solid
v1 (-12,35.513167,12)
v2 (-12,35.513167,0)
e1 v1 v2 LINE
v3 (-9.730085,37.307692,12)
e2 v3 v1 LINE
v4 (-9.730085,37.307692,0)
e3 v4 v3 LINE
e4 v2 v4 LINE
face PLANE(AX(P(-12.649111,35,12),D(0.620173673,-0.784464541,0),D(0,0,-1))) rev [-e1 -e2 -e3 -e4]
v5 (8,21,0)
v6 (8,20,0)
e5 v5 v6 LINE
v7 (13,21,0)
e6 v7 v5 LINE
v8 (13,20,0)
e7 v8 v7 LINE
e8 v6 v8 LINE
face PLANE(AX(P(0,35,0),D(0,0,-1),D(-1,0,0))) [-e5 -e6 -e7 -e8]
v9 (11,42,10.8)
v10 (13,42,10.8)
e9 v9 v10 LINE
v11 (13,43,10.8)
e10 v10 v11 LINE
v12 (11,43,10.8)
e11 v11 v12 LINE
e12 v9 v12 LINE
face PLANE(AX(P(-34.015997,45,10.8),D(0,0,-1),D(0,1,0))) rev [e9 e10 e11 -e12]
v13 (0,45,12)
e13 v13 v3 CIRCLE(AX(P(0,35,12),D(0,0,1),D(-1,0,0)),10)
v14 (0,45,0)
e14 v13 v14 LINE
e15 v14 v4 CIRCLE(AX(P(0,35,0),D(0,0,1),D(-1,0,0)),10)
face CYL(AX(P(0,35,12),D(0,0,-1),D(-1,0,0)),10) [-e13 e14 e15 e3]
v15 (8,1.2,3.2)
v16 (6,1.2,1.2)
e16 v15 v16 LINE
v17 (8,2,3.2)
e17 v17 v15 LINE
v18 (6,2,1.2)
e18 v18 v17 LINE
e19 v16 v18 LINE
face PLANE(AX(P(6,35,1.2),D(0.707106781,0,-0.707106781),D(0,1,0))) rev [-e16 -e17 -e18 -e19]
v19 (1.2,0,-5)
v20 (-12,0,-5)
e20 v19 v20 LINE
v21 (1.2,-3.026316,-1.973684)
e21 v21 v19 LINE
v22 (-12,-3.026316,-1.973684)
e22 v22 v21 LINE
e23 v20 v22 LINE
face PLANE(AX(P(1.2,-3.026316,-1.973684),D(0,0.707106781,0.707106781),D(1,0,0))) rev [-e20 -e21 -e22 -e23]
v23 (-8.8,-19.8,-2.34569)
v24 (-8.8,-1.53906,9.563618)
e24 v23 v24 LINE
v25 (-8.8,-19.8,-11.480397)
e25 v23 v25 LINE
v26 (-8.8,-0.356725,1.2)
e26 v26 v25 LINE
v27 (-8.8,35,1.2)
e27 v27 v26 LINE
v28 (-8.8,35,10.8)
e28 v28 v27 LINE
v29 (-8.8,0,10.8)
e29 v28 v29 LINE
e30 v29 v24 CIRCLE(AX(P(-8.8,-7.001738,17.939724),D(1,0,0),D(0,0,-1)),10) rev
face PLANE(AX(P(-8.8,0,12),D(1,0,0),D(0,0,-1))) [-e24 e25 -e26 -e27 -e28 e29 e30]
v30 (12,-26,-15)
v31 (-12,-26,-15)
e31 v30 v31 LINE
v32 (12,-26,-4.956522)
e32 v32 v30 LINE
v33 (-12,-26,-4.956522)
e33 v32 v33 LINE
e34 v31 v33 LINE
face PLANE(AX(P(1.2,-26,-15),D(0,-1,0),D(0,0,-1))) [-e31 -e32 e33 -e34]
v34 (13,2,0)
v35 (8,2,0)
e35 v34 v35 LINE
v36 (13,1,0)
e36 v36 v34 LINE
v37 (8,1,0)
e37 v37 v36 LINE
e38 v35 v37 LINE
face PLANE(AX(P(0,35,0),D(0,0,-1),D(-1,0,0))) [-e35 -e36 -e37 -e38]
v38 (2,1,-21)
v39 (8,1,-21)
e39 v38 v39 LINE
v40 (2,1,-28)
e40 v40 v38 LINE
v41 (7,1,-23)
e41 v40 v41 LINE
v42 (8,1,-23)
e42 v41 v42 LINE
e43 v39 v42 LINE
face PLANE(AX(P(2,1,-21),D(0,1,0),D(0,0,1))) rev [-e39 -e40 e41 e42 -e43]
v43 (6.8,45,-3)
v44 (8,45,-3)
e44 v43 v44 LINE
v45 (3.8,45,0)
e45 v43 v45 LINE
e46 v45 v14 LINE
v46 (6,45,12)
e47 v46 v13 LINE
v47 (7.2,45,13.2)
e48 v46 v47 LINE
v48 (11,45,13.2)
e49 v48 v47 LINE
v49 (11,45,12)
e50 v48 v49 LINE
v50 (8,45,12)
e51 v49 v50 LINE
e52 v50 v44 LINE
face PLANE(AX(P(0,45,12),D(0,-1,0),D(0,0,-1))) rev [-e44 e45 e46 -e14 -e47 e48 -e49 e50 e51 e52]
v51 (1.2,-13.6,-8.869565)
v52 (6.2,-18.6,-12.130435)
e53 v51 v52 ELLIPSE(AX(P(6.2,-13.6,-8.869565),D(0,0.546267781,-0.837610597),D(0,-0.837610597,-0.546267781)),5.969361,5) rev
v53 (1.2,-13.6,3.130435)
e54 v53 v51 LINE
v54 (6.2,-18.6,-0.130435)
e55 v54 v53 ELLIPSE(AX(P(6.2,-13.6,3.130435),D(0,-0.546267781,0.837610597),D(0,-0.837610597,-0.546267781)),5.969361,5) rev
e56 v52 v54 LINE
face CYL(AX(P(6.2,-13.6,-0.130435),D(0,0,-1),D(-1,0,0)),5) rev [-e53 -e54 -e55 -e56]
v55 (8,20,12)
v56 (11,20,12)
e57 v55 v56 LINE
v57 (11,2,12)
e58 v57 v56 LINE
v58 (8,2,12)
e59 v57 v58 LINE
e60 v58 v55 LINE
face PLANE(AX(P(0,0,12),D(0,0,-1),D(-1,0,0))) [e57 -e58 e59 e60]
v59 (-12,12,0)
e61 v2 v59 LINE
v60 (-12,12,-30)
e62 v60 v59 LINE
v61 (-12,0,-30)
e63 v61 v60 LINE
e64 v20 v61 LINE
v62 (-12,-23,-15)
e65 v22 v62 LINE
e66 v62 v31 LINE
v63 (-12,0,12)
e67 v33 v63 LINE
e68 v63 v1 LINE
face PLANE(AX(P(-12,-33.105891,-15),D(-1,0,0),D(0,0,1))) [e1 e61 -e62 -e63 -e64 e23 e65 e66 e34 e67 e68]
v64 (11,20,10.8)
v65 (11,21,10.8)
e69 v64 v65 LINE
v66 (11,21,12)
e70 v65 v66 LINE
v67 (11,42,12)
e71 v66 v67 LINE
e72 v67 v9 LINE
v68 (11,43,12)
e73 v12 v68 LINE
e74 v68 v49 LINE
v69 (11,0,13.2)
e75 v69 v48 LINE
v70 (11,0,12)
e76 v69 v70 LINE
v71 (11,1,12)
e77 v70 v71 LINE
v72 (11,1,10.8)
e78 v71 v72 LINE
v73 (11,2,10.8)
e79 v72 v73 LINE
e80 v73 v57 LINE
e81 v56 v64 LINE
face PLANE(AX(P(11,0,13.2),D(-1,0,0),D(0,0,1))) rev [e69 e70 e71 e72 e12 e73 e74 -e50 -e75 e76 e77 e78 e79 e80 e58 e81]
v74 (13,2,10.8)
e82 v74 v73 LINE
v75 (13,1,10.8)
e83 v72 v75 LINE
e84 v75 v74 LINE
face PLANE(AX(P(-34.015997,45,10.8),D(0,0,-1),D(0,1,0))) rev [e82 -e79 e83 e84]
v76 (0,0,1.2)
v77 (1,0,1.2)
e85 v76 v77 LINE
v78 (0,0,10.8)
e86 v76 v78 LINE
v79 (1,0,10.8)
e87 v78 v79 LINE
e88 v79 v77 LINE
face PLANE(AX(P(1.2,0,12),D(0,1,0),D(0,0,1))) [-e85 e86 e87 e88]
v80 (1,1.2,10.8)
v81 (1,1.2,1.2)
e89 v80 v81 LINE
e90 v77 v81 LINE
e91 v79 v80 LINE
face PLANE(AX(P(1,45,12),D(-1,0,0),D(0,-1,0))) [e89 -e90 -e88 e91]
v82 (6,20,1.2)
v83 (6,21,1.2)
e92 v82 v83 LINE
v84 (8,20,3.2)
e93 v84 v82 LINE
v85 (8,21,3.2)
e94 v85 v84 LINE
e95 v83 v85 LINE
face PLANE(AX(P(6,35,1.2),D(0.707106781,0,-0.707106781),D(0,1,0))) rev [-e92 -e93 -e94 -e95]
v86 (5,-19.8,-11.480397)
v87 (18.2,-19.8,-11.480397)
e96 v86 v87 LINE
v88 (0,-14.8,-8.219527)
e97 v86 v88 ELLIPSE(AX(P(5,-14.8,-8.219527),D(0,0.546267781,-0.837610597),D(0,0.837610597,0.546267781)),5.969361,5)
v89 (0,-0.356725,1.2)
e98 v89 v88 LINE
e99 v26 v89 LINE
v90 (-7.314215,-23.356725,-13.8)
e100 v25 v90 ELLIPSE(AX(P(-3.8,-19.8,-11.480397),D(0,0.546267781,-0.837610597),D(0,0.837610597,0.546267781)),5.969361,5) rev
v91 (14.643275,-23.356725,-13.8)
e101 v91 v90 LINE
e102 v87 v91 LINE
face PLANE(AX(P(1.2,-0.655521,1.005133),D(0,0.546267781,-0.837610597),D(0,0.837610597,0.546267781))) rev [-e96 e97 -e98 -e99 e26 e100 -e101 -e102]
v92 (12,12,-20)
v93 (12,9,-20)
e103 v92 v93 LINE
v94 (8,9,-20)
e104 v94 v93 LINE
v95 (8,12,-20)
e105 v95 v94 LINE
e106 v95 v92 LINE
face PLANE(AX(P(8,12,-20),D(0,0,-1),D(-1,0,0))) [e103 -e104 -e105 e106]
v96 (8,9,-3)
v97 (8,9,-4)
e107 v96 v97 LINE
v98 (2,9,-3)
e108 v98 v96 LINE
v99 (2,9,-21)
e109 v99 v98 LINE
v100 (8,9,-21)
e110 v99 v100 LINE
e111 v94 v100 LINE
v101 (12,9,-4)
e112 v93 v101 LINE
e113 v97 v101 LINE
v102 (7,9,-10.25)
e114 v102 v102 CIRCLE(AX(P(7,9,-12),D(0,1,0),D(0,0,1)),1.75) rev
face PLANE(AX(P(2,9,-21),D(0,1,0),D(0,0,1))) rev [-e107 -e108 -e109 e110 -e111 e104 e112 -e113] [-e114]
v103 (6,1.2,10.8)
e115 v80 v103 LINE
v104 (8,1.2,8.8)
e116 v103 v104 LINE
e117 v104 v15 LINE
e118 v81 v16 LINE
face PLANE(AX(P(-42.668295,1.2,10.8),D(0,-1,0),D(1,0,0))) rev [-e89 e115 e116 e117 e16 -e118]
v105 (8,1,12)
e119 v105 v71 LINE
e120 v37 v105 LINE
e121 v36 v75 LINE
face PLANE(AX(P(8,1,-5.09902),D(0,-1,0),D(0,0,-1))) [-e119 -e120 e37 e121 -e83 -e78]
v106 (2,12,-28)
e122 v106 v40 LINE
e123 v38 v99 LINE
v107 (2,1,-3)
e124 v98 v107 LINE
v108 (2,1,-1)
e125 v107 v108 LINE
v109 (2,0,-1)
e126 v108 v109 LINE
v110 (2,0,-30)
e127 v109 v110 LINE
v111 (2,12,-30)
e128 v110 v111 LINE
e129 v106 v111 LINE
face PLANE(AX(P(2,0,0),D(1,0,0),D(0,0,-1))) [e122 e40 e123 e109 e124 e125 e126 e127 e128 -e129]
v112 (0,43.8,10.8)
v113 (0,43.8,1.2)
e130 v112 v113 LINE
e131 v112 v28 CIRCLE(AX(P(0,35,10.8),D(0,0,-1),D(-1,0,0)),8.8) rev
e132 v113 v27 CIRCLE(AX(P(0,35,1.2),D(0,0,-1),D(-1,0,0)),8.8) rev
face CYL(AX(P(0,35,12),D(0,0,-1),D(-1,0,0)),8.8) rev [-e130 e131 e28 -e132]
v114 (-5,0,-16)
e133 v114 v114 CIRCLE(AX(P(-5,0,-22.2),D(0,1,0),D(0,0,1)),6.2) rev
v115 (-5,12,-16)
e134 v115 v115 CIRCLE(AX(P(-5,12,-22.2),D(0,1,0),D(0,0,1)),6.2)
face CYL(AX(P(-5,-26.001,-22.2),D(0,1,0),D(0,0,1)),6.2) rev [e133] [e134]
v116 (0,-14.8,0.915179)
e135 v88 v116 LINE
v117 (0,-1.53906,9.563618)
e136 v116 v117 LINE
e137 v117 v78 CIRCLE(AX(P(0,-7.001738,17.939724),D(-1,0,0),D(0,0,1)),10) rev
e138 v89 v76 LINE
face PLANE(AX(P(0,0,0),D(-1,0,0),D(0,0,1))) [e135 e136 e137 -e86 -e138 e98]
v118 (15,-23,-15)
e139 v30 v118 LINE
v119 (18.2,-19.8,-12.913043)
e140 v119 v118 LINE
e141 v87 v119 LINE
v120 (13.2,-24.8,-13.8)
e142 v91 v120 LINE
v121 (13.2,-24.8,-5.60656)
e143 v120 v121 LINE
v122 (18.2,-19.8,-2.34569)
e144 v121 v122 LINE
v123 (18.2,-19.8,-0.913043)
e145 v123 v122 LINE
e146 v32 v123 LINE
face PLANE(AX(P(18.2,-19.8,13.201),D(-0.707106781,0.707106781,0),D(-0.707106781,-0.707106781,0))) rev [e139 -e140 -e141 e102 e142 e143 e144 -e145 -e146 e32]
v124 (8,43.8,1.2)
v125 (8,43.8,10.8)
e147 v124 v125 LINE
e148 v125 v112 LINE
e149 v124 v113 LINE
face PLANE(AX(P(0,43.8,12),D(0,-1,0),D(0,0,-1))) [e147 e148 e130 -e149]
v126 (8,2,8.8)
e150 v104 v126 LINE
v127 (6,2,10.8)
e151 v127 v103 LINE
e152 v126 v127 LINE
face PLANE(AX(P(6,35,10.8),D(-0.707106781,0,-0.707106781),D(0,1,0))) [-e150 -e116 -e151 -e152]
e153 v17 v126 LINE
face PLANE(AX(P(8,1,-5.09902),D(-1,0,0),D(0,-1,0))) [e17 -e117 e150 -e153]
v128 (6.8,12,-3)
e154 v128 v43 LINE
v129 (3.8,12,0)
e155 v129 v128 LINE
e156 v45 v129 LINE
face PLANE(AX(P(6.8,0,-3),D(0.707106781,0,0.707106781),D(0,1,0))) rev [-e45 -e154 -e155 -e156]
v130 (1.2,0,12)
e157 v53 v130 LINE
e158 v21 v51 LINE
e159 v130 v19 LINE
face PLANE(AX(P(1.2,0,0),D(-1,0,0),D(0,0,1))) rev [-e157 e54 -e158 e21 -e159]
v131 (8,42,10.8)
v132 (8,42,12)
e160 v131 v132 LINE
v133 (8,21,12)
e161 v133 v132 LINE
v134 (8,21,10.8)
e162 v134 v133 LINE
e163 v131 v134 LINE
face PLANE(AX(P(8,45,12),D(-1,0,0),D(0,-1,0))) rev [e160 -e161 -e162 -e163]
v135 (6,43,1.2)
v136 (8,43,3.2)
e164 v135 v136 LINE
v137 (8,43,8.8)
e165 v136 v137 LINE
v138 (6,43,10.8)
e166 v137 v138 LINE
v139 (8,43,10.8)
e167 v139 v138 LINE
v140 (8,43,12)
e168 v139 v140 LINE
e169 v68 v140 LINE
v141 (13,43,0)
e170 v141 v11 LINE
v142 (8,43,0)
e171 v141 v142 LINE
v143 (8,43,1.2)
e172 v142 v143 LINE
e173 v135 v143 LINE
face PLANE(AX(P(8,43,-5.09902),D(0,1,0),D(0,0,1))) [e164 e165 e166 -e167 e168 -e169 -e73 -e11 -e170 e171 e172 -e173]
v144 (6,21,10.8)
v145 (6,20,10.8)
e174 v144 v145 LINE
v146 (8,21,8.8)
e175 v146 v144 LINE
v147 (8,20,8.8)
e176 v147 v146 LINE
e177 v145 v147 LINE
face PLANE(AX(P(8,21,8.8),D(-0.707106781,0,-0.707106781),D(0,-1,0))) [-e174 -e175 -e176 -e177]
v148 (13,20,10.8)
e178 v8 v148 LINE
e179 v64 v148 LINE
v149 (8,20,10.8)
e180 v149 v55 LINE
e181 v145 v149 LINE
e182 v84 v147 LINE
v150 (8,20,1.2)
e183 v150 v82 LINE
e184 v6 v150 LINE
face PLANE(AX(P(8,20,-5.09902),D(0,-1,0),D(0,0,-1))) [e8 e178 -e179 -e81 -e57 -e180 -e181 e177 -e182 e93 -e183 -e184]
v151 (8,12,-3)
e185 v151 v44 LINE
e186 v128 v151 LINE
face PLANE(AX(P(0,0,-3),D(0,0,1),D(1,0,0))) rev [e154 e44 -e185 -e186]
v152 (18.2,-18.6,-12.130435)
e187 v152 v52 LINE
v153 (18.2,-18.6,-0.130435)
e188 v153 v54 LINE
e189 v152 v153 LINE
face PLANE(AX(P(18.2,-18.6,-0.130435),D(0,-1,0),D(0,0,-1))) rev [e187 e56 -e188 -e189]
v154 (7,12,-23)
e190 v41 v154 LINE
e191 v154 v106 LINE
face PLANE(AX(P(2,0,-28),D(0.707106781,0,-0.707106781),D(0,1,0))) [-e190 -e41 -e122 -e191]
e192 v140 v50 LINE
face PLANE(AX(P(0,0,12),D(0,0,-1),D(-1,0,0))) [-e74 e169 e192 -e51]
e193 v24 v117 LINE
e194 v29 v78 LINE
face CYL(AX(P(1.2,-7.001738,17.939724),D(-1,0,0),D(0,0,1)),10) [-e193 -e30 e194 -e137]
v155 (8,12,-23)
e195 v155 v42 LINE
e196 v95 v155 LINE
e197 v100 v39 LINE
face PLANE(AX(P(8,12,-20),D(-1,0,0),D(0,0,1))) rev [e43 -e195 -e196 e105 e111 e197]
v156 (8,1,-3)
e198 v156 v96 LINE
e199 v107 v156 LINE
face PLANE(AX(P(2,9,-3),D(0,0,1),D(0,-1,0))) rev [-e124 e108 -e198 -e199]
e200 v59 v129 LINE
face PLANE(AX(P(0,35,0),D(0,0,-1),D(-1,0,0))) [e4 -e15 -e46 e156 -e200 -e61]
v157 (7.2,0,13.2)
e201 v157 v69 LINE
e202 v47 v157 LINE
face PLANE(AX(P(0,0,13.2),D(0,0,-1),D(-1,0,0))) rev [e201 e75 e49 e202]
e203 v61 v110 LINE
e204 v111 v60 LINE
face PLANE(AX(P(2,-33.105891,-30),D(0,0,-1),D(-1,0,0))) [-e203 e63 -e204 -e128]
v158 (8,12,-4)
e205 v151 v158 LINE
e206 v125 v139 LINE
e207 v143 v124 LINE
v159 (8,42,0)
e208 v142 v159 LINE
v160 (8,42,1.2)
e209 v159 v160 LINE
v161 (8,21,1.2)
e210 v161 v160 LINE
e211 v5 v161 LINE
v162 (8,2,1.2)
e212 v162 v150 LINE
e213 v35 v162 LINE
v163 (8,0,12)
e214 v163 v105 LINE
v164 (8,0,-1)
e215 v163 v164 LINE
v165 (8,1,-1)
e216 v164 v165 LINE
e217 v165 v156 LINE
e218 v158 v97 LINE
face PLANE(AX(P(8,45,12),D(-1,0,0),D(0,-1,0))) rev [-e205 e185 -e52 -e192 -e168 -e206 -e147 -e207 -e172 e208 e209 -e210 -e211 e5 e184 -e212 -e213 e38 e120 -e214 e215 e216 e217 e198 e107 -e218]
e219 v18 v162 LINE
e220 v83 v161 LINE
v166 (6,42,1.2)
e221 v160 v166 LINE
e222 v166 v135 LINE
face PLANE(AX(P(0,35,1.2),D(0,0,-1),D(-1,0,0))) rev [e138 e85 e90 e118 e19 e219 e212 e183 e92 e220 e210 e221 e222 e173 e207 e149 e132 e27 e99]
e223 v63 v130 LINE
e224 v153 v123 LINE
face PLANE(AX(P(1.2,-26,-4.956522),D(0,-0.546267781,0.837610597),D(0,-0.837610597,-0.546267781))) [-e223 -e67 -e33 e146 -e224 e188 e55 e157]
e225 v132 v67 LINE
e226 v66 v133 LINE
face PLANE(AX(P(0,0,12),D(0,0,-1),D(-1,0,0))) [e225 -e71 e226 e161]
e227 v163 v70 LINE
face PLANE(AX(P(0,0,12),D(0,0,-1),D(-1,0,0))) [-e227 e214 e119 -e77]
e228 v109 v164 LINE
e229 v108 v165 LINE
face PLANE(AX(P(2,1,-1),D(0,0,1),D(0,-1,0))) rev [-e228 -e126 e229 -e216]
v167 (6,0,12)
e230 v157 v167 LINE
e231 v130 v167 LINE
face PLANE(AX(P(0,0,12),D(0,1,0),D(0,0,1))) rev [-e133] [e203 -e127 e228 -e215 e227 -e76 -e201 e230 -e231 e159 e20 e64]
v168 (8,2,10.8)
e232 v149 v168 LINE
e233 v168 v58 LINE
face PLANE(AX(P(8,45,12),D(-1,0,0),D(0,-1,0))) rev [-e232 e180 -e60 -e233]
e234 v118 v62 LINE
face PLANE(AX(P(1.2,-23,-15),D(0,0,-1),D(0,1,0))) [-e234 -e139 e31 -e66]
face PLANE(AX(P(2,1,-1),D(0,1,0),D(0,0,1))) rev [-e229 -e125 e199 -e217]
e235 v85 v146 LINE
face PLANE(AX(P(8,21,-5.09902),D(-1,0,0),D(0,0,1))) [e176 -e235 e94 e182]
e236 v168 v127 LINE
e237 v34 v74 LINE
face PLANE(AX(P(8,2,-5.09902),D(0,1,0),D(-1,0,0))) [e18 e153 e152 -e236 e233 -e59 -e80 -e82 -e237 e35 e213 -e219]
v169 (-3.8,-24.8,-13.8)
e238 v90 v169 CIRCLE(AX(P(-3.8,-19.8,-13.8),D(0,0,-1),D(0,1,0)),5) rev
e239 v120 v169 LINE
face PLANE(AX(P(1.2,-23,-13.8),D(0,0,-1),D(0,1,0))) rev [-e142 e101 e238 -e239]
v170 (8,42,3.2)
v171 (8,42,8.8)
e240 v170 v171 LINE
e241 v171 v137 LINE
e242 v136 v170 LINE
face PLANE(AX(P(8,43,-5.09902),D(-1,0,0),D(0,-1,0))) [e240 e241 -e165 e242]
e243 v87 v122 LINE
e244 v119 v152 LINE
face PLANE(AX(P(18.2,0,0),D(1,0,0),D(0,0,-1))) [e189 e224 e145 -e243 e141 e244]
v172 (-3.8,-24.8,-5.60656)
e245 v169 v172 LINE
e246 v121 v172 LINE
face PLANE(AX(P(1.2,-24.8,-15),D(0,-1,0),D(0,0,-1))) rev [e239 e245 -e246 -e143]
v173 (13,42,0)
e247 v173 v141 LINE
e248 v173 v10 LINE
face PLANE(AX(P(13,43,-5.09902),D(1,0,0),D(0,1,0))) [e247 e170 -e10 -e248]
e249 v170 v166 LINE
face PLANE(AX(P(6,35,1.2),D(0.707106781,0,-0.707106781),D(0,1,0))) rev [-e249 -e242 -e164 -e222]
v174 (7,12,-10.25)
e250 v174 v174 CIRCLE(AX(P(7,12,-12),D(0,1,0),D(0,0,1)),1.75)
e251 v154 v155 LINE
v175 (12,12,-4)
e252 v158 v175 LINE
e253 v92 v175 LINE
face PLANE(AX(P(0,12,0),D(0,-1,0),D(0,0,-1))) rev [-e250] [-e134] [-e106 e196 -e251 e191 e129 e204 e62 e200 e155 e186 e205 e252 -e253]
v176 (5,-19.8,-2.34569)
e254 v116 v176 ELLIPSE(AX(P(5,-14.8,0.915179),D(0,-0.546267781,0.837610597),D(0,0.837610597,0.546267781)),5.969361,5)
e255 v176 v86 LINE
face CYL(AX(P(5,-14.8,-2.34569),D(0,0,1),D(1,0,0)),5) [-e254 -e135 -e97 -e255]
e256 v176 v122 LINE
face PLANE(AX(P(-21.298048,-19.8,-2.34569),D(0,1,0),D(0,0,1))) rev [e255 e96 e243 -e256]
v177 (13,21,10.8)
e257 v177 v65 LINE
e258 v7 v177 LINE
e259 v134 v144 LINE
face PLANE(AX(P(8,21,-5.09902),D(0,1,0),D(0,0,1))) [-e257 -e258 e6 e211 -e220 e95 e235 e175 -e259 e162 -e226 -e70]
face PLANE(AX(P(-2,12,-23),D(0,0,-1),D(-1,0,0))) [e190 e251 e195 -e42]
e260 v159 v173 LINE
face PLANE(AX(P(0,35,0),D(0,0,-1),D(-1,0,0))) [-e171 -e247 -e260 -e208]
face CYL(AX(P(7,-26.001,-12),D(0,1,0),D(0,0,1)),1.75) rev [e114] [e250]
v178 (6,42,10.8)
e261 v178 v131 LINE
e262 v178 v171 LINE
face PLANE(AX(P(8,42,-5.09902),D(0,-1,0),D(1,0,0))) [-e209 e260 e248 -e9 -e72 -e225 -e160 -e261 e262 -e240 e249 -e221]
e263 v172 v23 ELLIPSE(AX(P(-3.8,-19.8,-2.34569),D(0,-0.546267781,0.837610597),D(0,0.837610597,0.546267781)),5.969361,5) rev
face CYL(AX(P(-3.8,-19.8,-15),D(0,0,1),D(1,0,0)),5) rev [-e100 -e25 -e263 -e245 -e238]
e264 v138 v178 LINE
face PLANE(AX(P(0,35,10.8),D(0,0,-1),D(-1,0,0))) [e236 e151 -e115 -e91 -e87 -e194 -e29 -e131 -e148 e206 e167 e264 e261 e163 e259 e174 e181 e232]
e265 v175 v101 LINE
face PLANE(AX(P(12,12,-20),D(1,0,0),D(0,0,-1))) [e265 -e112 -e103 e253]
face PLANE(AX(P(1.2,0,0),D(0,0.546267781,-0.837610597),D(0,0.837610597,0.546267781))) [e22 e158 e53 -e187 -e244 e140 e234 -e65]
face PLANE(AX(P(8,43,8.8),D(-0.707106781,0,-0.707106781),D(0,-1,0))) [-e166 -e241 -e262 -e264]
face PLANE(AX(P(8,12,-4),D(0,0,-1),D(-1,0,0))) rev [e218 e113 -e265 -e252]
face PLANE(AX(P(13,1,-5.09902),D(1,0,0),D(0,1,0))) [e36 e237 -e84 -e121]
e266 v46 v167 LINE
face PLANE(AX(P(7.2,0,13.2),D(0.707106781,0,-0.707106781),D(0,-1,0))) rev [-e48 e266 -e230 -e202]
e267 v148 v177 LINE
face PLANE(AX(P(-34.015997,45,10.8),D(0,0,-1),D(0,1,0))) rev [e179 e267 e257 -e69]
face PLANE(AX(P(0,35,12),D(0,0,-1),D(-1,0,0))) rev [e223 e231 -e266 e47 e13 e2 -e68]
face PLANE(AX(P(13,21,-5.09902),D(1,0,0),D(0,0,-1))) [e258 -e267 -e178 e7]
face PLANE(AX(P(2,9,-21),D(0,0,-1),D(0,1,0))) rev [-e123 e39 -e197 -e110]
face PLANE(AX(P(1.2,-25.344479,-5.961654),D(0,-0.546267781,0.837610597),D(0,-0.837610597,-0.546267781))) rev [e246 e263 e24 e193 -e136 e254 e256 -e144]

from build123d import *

# Parameters (mm, degrees)
BOSS_EXTRUDE1_DEPTH       = 12
SHELL1_T                  = -1.2
SHELL1_THICKNESS_2_FACE_W = 43.8
SHELL1_THICKNESS_2_FACE_H = 9.6
SHELL1_THICKNESS_2_DEPTH  = 5.8
SKETCH2_W                 = 9.6
SKETCH2_H                 = 42.6
CUT_EXTRUDE2_DEPTH        = 7
BOSS_EXTRUDE3_REACH       = 49.634
SKETCH3_W                 = 5
SKETCH3_H                 = 1
BOSS_EXTRUDE4_DEPTH       = 11.2
SHELL2_START              = -8.8
SHELL2_DEPTH              = 8.8
CUT_EXTRUDE3_REACH        = 50.88
FILLET1_R                 = 10
BOSS_EXTRUDE5_DEPTH       = 17
SKETCH7_W                 = 5
SKETCH7_H                 = 45
BOSS_EXTRUDE6_DEPTH       = 1.2
SKETCH8_W                 = 1.2
SKETCH8_H                 = 45
BOSS_EXTRUDE7_DEPTH       = 3
CHAMFER1_SIZE             = 1.2
CHAMFER2_SIZE             = 3
CHAMFER3_SIZE             = 2
SKETCH9_W                 = 1.2
SKETCH9_H                 = 45
CUT_EXTRUDE4_DEPTH        = 2
CUT_EXTRUDE6_REACH        = 58.138
BOSS_EXTRUDE10_DEPTH      = 12
CUT_EXTRUDE8_DEPTH        = 10
CUT_EXTRUDE9_REACH        = 50.002
SKETCH20_R                = 1.75
BOSS_EXTRUDE11_DEPTH      = 12
CUT_EXTRUDE10_REACH       = 53.723
SKETCH22_R                = 6.2
CHAMFER4_SIZE             = 5
BOSS_EXTRUDE12_DEPTH      = 2
CHAMFER6_SIZE             = 5
CHAMFER6_SIZE2            = 3.613034268
FILLET2_R                 = 5


# Read off the part's stored shape, not the designer's step: Shell2
# Some blends are built 0.0001 mm under size
with BuildPart() as part:
    # Sketch1 → Boss-Extrude1 (new body)
    with BuildSketch(Plane.XY):
        with BuildLine():
            Line((-10, 0), (-10, 35))
            ThreePointArc((-10, 35), (-7.071067812, 42.071067812), (0, 45))
            Line((0, 45), (8, 45))
            Line((8, 45), (8, 0))
            Line((8, 0), (0, 0))
            Line((0, 0), (-10, 0))
        make_face()
    extrude(amount=BOSS_EXTRUDE1_DEPTH)

    # Shell1
    shell1_openings = [part.faces().sort_by_distance(p)[0] for p in [
        (-1, 0, 6),
    ]]
    offset(amount=SHELL1_T, openings=shell1_openings, kind=Kind.INTERSECTION)

    # Shell1 thickness 2 face (on inner face of the shell) → Shell1 thickness 2 (add)
    with BuildSketch(Plane(origin=(6.8, 21.9, 6), x_dir=(0, 1, 0), z_dir=(1, 0, 0))):
        Rectangle(SHELL1_THICKNESS_2_FACE_W, SHELL1_THICKNESS_2_FACE_H)
    extrude(amount=-SHELL1_THICKNESS_2_DEPTH)

    # Sketch2 → Cut-Extrude2 (cut)
    with BuildSketch(Plane(origin=(8, 0, 0), x_dir=(0, 0, -1), z_dir=(1, 0, 0))):
        with Locations((-6, 22.5)):
            Rectangle(SKETCH2_W, SKETCH2_H)
    extrude(amount=-CUT_EXTRUDE2_DEPTH, mode=Mode.SUBTRACT)

    # Boss-Extrude3: up to this face of the body (flat: up to its plane)
    boss_extrude3_end = Plane(part.part.faces().sort_by_distance((-0.815853962, 21.94845022, 0))[0])
    # Sketch3 → Boss-Extrude3 (add, up to the picked face)
    with BuildSketch(Plane.XY.offset(12), mode=Mode.PRIVATE) as boss_extrude3_sk1:
        with Locations((10.5, 1.5)):
            Rectangle(SKETCH3_W, SKETCH3_H)
    boss_extrude3_tool1 = split(extrude(boss_extrude3_sk1.sketch, amount=-BOSS_EXTRUDE3_REACH, mode=Mode.PRIVATE), bisect_by=boss_extrude3_end, keep=Keep.BOTH, mode=Mode.PRIVATE)
    # Sketch3 → Boss-Extrude3 (add, up to the picked face)
    with BuildSketch(Plane.XY.offset(12), mode=Mode.PRIVATE) as boss_extrude3_sk2:
        with Locations((10.5, 42.5)):
            Rectangle(SKETCH3_W, SKETCH3_H)
    boss_extrude3_tool2 = split(extrude(boss_extrude3_sk2.sketch, amount=-BOSS_EXTRUDE3_REACH, mode=Mode.PRIVATE), bisect_by=boss_extrude3_end, keep=Keep.BOTH, mode=Mode.PRIVATE)
    # Sketch3 → Boss-Extrude3 (add, up to the picked face)
    with BuildSketch(Plane.XY.offset(12), mode=Mode.PRIVATE) as boss_extrude3_sk3:
        with Locations((10.5, 20.5)):
            Rectangle(SKETCH3_W, SKETCH3_H)
    boss_extrude3_tool3 = split(extrude(boss_extrude3_sk3.sketch, amount=-BOSS_EXTRUDE3_REACH, mode=Mode.PRIVATE), bisect_by=boss_extrude3_end, keep=Keep.BOTH, mode=Mode.PRIVATE)
    add(boss_extrude3_tool1.solids().sort_by(Axis((10.5, 1.5, 12), (0, 0, -1)))[0])
    add(boss_extrude3_tool2.solids().sort_by(Axis((10.5, 42.5, 12), (0, 0, -1)))[0])
    add(boss_extrude3_tool3.solids().sort_by(Axis((10.5, 20.5, 12), (0, 0, -1)))[0])

    # Sketch4 → Boss-Extrude4 (add)
    with BuildSketch(Plane.ZY.offset(10)):
        Polygon((0, 0), (-15, -23), (-15, -26), (-4.956521739, -26), (12, 0), align=None)
    extrude(amount=-BOSS_EXTRUDE4_DEPTH)

    # Shell2 outline → Shell2 (cut)
    with BuildSketch(Plane.YZ.offset(SHELL2_START)):
        Polygon((-24.8, -13.8), (-23.356724835, -13.8), (-0.356724835, 1.2), (0, 1.2), (0, 10.567353369), (-24.8, -5.606559675), align=None)
    extrude(amount=SHELL2_DEPTH, mode=Mode.SUBTRACT)

    # Sketch5 → Cut-Extrude3 (cut, up to next)
    with BuildSketch(Plane(origin=(1.2, 0, 0), x_dir=(0, 0, -1), z_dir=(1, 0, 0)), mode=Mode.PRIVATE) as cut_extrude3_sk1:
        Polygon((2.34569011, -19.8), (11.480396847, -19.8), (13.8, -23.356724835), (13.8, -24.8), (5.606559675, -24.8), align=None)
    cut_extrude3_tool1 = extrude(cut_extrude3_sk1.sketch, amount=-CUT_EXTRUDE3_REACH, mode=Mode.PRIVATE) & part.part
    add(cut_extrude3_tool1.solids().sort_by_distance((1.2, -22.269522, -8.459387))[0], mode=Mode.SUBTRACT)

    # Fillet1
    # the kernel refuses this fillet: 10 mm, written as the material it takes off along each edge
    with BuildSketch(Plane(origin=(-8.8, 0, 10.567353369), x_dir=(0, -0.8376105968305514, -0.5462677805592855), z_dir=(1, 0, 0))) as fillet1_piece_1:
        with BuildLine():
            CenterArc((1.837441188, -10), FILLET1_R, 90, 11.329607827)
            Line((-0.127087359, -0.194867283), (0, 0))
            Line((0, 0), (1.837441188, 0))
        make_face()
    extrude(amount=8.8, mode=Mode.SUBTRACT)

    # Sketch6 → Boss-Extrude5 (add)
    with BuildSketch(Plane(origin=(1.2, 0, 0), x_dir=(0, 0, -1), z_dir=(1, 0, 0))):
        Polygon((0.130434783, -18.6), (4.956521739, -26), (15, -26), (15, -23), (12.130434783, -18.6), align=None)
        Polygon((2.34569011, -19.8), (5.606559675, -24.8), (13.8, -24.8), (13.8, -23.356724835), (11.480396847, -19.8), align=None, mode=Mode.SUBTRACT)
    extrude(amount=BOSS_EXTRUDE5_DEPTH)

    # Sketch7 → Boss-Extrude6 (add)
    with BuildSketch(Plane.XY.offset(12)):
        with Locations((8.5, 22.5)):
            Rectangle(SKETCH7_W, SKETCH7_H)
    extrude(amount=BOSS_EXTRUDE6_DEPTH)

    # Sketch8 → Boss-Extrude7 (add)
    with BuildSketch(Plane(origin=(0, 0, 0), x_dir=(-1, 0, 0), z_dir=(0, 0, -1))):
        with Locations((-7.4, 22.5)):
            Rectangle(SKETCH8_W, SKETCH8_H)
    extrude(amount=BOSS_EXTRUDE7_DEPTH)

    # Chamfer1
    chamfer1_edges = [part.edges().sort_by_distance(p)[0] for p in [
        (6, 22.5, 13.2),
    ]]
    chamfer(chamfer1_edges, length=CHAMFER1_SIZE - 0.0001)  # a hair under: the kernel refuses the full size

    # Chamfer2
    chamfer2_edges = [part.edges().sort_by_distance(p)[0] for p in [
        (6.8, 22.5, 0),
    ]]
    chamfer(chamfer2_edges, length=CHAMFER2_SIZE - 0.0001)  # a hair under: the kernel refuses the full size

    # Chamfer3
    chamfer3_edges = [part.edges().sort_by_distance(p)[0] for p in [
        (8, 1.6, 1.2),
        (8, 1.6, 10.8),
        (8, 42.5, 1.2),
        (8, 42.5, 10.8),
        (8, 20.5, 1.2),
        (8, 20.5, 10.8),
    ]]
    chamfer(chamfer3_edges, length=CHAMFER3_SIZE)

    # Sketch9 → Cut-Extrude4 (cut)
    with BuildSketch(Plane(origin=(13, 0, 0), x_dir=(0, 0, -1), z_dir=(1, 0, 0))):
        with Locations((-11.4, 22.5)):
            Rectangle(SKETCH9_W, SKETCH9_H)
    extrude(amount=-CUT_EXTRUDE4_DEPTH, mode=Mode.SUBTRACT)

    # Sketch13 → Cut-Extrude6 (cut, up to next)
    with BuildSketch(Plane(origin=(0, 0, -15), x_dir=(-1, 0, 0), z_dir=(0, 0, -1)), mode=Mode.PRIVATE) as cut_extrude6_sk1:
        Polygon((-18.2, -19.8), (-12, -26), (-18.2, -26), align=None)
    cut_extrude6_tool1 = extrude(cut_extrude6_sk1.sketch, amount=-CUT_EXTRUDE6_REACH, mode=Mode.PRIVATE) & part.part
    add(cut_extrude6_tool1.solids().sort_by_distance((16.133333, -23.933333, -15))[0], mode=Mode.SUBTRACT)

    # Sketch18 → Boss-Extrude10 (add)
    with BuildSketch(Plane(origin=(0, 0, 0), x_dir=(1, 0, 0), z_dir=(0, 1, 0))):
        Polygon((8, 20), (8, 23), (-2, 23), (-2, 0), (8, 0), (8, 4), (12, 4), (12, 20), align=None)
    extrude(amount=BOSS_EXTRUDE10_DEPTH)

    # Sketch19 → Cut-Extrude8 (cut)
    with BuildSketch(Plane(origin=(12, 0, 0), x_dir=(0, 0, -1), z_dir=(1, 0, 0))):
        Polygon((21, 9), (3, 9), (3, 1), (1, 1), (1, 0), (23, 0), (23, 1), (21, 1), align=None)
    extrude(amount=-CUT_EXTRUDE8_DEPTH, mode=Mode.SUBTRACT)

    # Sketch20 → Cut-Extrude9 (cut, up to next)
    with BuildSketch(Plane(origin=(0, 12, 0), x_dir=(1, 0, 0), z_dir=(0, 1, 0)), mode=Mode.PRIVATE) as cut_extrude9_sk1:
        with Locations(Location((7, 12, 0), (0, 0, 270))):
            Circle(SKETCH20_R)
    cut_extrude9_tool1 = extrude(cut_extrude9_sk1.sketch, amount=-CUT_EXTRUDE9_REACH, mode=Mode.PRIVATE) & part.part
    add(cut_extrude9_tool1.solids().sort_by_distance((7, 12, -12))[0], mode=Mode.SUBTRACT)

    # Sketch21 → Boss-Extrude11 (add)
    with BuildSketch(Plane(origin=(0, 12, 0), x_dir=(1, 0, 0), z_dir=(0, 1, 0))):
        Polygon((2, 15), (-2, 15), (-2, 0), (-12, 0), (-12, 15), (-12, 30), (2, 30), align=None)
    extrude(amount=-BOSS_EXTRUDE11_DEPTH)

    # Sketch22 → Cut-Extrude10 (cut, up to next)
    with BuildSketch(Plane(origin=(0, 12, 0), x_dir=(1, 0, 0), z_dir=(0, 1, 0)), mode=Mode.PRIVATE) as cut_extrude10_sk1:
        with Locations(Location((-5, 22.2, 0), (0, 0, 270))):
            Circle(SKETCH22_R)
    cut_extrude10_tool1 = extrude(cut_extrude10_sk1.sketch, amount=-CUT_EXTRUDE10_REACH, mode=Mode.PRIVATE) & part.part
    add(cut_extrude10_tool1.solids().sort_by_distance((-5, 12, -22.2))[0], mode=Mode.SUBTRACT)

    # Chamfer4
    chamfer4_edges = [part.edges().sort_by_distance(p)[0] for p in [
        (2, 6.5, -23),
    ]]
    chamfer(chamfer4_edges, length=CHAMFER4_SIZE)

    # Sketch24 → Boss-Extrude12 (add)
    with BuildSketch(Plane.ZY.offset(10)):
        Polygon((-15, -26), (-4.956521739, -26), (12, 0), (12, 35), (0, 35), (0, 0), (-15, -23), align=None)
    extrude(amount=BOSS_EXTRUDE12_DEPTH)

    # Chamfer5
    # the kernel refuses this chamfer: 3 mm, written as the material it adds along each edge
    with BuildSketch(Plane(origin=(-10, 35, 0), x_dir=(0.15107271511055767, 0.9885226526231577, 0), z_dir=(0, 0, 1))) as chamfer5_piece_1_section:
        with BuildLine():
            Line((2.409770926, 0), (-0.487996367, 2.700518235))
            Line((-0.487996367, 2.700518235), (-0.547307726, 2.691453872))
            ThreePointArc((-0.547307726, 2.691453872), (-0.266526199, 1.346816234), (-0.059311359, -0.009064363))
            Line((-0.059311359, -0.009064363), (0.009064363, -0.059311359))
            ThreePointArc((0.009064363, -0.059311359), (1.203337899, 0.050019412), (2.404903392, -0.059802233))
            Line((2.404903392, -0.059802233), (2.409770926, 0))
        make_face()
    chamfer5_piece_1 = extrude(amount=12, mode=Mode.PRIVATE)
    chamfer5_piece_1 = split(chamfer5_piece_1, bisect_by=Plane(origin=(-12, 35.791311863, 6), z_dir=(1, 0, 0)), keep=Keep.TOP, mode=Mode.PRIVATE)
    add(chamfer5_piece_1)

    # Chamfer6
    chamfer6_edges = [part.edges().sort_by_distance(p)[0] for p in [
        (-5.4, 0, 0),
    ]]
    chamfer6_side = [part.faces().sort_by_distance(p)[0] for p in [
        (-2.663573131, 0, -7.819292495),
    ]]
    chamfer(chamfer6_edges, length=CHAMFER6_SIZE, length2=CHAMFER6_SIZE2, reference=chamfer6_side[0])

    # Fillet2
    # the kernel refuses this fillet: 5 mm, written as the material it adds along each edge
    with BuildSketch(Plane(origin=(1.2, -18.6, -24.630434783), x_dir=(1, 0, 0), z_dir=(0, 0, 1))) as fillet2_piece_1_section:
        with BuildLine():
            CenterArc((FILLET2_R, FILLET2_R), FILLET2_R, 180, 90)
            Line((0, FILLET2_R), (0, 0))
            Line((0, 0), (FILLET2_R, 0))
        make_face()
    fillet2_piece_1 = extrude(amount=37, mode=Mode.PRIVATE)
    fillet2_piece_1 = split(fillet2_piece_1, bisect_by=Plane(origin=(2.316839695, -20.228518395, -1.192511997), z_dir=(0, 0.5462677805469222, -0.8376105968386143)), keep=Keep.TOP, mode=Mode.PRIVATE)
    fillet2_piece_1 = split(fillet2_piece_1, bisect_by=Plane(origin=(2.316839695, -14.737802215, -9.61161014), z_dir=(0, -0.5462677805469223, 0.8376105968386143)), keep=Keep.TOP, mode=Mode.PRIVATE)
    add(fillet2_piece_1)
    with BuildSketch(Plane(origin=(-8.8, -24.8, 6.893440325), x_dir=(0, 1, 0), z_dir=(0, 0, -1))) as fillet2_piece_2_section:
        with BuildLine():
            CenterArc((FILLET2_R, FILLET2_R), FILLET2_R, 180, 90)
            Line((0, FILLET2_R), (0, 0))
            Line((0, 0), (FILLET2_R, 0))
        make_face()
    fillet2_piece_2 = extrude(amount=33.193440325, mode=Mode.PRIVATE)
    fillet2_piece_2 = split(fillet2_piece_2, bisect_by=Plane(origin=(-7.705272572, -26.311851744, -5.159903312), z_dir=(0, 0.5462677805469222, -0.8376105968386143)), keep=Keep.TOP, mode=Mode.PRIVATE)
    fillet2_piece_2 = split(fillet2_piece_2, bisect_by=Plane(origin=(-7.705272572, -23.651485488, -15), z_dir=(0, 0, 1)), keep=Keep.TOP, mode=Mode.PRIVATE)
    fillet2_piece_2 = split(fillet2_piece_2, bisect_by=Plane(origin=(-7.705272572, -20.821135564, -13.579001455), z_dir=(0, -0.5462677805469223, 0.8376105968386143)), keep=Keep.TOP, mode=Mode.PRIVATE)
    add(fillet2_piece_2)
    # the kernel refuses this fillet: 5 mm, written as the material it takes off along each edge
    with BuildSketch(Plane(origin=(0, -19.8, -23.980396847), x_dir=(1, 0, 0), z_dir=(0, 0, 1))) as fillet2_2_piece_1_section:
        with BuildLine():
            CenterArc((FILLET2_R, FILLET2_R), FILLET2_R, 180, 90)
            Line((0, FILLET2_R), (0, 0))
            Line((0, 0), (FILLET2_R, 0))
        make_face()
    fillet2_2_piece_1 = extrude(amount=34.134706737, mode=Mode.PRIVATE)
    fillet2_2_piece_1 = split(fillet2_2_piece_1, bisect_by=Plane(origin=(1.116839695, -20.772997059, -2.980253409), z_dir=(0, 0.5462677805469219, -0.8376105968386146)), keep=Keep.TOP, mode=Mode.PRIVATE)
    fillet2_2_piece_1 = split(fillet2_2_piece_1, bisect_by=Plane(origin=(1.116839695, -16.593323552, -9.38908612), z_dir=(0, -0.5462677805469225, 0.8376105968386142)), keep=Keep.TOP, mode=Mode.PRIVATE)
    add(fillet2_2_piece_1, mode=Mode.SUBTRACT)


solid = part.part
